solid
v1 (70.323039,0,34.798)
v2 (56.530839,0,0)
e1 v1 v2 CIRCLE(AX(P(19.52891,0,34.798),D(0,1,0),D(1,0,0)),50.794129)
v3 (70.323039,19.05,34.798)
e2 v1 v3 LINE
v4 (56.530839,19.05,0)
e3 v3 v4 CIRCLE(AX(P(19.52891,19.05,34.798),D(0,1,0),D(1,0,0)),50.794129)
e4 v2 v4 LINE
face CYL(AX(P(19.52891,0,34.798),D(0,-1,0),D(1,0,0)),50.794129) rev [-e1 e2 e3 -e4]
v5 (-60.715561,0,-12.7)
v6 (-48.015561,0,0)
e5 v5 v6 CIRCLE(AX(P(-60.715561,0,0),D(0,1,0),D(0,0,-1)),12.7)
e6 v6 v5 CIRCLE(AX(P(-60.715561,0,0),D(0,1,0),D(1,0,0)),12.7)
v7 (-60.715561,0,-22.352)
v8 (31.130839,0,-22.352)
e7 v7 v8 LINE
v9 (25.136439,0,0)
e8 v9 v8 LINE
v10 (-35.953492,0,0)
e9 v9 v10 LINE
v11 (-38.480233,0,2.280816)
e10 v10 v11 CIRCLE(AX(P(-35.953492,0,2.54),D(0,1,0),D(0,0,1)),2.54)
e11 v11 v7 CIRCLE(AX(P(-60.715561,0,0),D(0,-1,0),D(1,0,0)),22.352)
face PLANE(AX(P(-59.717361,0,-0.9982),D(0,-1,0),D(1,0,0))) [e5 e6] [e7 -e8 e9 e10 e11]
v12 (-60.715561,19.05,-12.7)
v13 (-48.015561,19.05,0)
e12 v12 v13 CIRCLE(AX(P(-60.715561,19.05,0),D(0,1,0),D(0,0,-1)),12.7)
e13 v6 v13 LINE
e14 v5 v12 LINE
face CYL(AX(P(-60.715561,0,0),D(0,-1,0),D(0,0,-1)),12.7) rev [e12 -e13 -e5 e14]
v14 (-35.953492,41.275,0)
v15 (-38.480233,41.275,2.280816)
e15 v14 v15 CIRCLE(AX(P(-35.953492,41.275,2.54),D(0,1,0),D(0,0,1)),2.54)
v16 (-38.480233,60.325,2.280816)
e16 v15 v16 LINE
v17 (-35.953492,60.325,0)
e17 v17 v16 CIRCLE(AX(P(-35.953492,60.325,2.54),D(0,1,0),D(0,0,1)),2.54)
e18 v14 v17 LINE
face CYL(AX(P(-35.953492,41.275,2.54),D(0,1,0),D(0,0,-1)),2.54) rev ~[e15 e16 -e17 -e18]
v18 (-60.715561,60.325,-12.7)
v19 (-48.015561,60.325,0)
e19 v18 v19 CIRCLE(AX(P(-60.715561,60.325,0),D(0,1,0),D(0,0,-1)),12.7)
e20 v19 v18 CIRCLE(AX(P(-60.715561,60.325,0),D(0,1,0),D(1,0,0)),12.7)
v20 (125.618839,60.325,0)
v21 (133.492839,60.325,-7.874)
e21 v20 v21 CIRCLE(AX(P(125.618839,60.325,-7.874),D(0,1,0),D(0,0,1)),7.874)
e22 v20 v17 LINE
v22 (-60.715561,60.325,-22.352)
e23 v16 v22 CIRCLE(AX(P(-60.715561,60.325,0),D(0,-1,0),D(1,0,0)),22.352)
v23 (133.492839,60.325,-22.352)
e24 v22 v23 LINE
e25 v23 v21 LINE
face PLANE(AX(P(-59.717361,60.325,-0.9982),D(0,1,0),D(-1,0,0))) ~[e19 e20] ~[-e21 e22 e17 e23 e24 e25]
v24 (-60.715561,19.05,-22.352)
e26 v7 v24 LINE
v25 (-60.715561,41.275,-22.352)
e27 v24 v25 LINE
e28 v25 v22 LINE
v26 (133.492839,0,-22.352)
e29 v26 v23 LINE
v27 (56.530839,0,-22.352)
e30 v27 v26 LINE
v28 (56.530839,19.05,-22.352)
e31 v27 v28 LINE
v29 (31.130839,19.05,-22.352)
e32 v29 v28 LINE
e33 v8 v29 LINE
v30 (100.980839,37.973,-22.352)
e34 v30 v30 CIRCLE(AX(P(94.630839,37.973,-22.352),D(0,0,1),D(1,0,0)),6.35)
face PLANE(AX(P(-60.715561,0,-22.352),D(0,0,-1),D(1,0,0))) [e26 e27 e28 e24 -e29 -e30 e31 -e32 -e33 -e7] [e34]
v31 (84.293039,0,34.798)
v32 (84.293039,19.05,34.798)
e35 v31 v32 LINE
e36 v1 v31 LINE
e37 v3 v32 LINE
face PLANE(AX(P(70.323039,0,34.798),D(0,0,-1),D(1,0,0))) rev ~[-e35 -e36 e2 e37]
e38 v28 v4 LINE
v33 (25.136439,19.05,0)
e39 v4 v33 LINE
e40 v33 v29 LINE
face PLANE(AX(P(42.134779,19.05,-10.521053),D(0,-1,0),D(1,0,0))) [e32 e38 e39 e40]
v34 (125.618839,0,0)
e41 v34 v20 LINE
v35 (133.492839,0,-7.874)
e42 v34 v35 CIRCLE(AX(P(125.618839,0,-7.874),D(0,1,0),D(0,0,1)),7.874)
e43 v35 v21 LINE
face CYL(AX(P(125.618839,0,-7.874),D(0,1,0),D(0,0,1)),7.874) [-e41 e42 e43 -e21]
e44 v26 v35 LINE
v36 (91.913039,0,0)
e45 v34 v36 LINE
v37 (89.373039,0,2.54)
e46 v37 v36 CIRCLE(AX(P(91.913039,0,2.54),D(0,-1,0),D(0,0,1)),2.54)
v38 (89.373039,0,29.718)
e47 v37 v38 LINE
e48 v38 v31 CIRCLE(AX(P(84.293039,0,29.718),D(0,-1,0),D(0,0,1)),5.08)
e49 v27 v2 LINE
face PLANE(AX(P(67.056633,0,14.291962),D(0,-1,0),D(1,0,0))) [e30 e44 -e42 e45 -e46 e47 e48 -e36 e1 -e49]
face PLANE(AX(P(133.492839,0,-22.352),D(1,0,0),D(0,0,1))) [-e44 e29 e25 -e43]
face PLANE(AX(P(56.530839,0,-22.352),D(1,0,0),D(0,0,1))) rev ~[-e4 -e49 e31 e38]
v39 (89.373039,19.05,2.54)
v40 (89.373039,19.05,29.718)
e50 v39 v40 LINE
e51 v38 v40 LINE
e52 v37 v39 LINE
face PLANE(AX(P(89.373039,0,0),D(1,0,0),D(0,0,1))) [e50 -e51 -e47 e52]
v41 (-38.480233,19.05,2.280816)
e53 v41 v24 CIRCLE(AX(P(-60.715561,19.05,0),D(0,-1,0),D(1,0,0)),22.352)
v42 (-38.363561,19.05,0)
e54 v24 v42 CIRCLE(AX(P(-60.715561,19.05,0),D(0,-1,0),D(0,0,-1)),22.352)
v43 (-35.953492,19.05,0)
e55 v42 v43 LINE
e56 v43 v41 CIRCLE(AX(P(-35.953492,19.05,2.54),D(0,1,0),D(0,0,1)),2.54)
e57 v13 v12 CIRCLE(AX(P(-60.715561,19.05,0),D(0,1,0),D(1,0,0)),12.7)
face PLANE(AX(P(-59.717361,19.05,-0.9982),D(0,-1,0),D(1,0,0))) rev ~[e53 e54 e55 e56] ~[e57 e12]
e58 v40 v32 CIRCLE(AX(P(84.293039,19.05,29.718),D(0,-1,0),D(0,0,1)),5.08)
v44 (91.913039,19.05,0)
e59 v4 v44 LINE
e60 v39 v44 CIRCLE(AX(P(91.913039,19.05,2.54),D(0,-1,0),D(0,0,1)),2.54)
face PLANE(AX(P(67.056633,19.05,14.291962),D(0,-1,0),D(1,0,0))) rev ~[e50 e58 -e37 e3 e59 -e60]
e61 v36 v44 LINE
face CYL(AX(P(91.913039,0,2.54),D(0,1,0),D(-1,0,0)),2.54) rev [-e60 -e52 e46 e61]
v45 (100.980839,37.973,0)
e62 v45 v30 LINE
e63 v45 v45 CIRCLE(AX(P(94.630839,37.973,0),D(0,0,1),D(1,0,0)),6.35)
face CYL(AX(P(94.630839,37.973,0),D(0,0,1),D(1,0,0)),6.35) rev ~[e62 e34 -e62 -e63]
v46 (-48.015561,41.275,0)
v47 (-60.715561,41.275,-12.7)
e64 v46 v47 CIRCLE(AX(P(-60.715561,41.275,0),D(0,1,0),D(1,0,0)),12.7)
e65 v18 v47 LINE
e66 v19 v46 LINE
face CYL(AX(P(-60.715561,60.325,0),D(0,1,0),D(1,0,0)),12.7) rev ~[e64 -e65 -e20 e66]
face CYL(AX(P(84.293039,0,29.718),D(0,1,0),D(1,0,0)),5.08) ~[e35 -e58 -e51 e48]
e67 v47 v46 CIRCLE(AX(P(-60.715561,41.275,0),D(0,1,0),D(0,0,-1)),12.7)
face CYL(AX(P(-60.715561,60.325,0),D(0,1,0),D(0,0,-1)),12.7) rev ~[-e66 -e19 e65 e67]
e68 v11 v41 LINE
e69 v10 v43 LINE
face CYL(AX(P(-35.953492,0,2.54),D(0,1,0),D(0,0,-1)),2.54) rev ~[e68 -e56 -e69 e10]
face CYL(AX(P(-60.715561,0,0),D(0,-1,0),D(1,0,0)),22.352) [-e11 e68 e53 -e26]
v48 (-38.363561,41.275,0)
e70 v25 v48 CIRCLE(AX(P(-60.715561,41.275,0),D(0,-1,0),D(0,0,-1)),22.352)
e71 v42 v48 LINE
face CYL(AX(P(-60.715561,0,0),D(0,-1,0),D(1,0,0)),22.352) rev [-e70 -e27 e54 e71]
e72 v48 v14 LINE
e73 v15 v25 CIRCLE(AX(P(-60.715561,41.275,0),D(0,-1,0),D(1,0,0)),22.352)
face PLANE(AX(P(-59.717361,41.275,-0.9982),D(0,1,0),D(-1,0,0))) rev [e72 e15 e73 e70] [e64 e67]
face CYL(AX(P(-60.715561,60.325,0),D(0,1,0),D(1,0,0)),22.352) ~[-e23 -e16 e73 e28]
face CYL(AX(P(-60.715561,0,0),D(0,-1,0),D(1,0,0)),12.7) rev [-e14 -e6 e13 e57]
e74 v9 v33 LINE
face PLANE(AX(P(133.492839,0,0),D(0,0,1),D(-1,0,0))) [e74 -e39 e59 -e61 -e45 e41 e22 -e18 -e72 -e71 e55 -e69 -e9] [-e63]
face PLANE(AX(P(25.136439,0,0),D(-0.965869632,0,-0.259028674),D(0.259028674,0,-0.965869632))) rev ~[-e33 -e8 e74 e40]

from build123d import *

# Parameters (mm, degrees)
F1_DEPTH = 60.325
F2_DEPTH = 19.05
F0_W     = 19.05
F0_H     = 34.798
F3_DEPTH = 19.05
F4_DEPTH = 19.05
F8_R     = 6.35
F9_DEPTH = 25.4
F10_R    = 7.874
F11_R    = 5.08
F12_R    = 2.54


with BuildPart() as f1:
    # F0 (on Front) → F1 (new body)
    with BuildSketch(Plane.XZ):
        with BuildLine():
            ThreePointArc((-38.3635606445, 0), (-44.9103098714, -15.8052507731), (-60.7155606445, -22.352))
            Line((-60.7155606445, -22.352), (31.1308393555, -22.352))
            Line((31.1308393555, -22.352), (25.1364393555, 0))
            Line((25.1364393555, 0), (-38.3635606445, 0))
        make_face()
        Polygon((25.1364393555, 0), (31.1308393555, -22.352), (56.5308393555, -22.352), (56.5308393555, 0), align=None)
        Polygon((56.5308393555, 0), (56.5308393555, -22.352), (133.4928393555, -22.352), (133.4928393555, 0), (89.3730393555, 0), (70.3230393555, 0), align=None)
    extrude(amount=-F1_DEPTH)

    # F0 (on Front) → F2 (cut)
    with BuildSketch(Plane.XZ):
        Polygon((25.1364393555, 0), (31.1308393555, -22.352), (56.5308393555, -22.352), (56.5308393555, 0), align=None)
    extrude(amount=-F2_DEPTH, mode=Mode.SUBTRACT)

    # F0 (on Front) → F3 (join)
    with BuildSketch(Plane.XZ):
        with BuildLine():
            ThreePointArc((70.3230393555, 34.798), (66.7492677026, 16.0821939471), (56.5308393555, 0))
            Line((56.5308393555, 0), (70.3230393555, 0))
            Line((70.3230393555, 0), (70.3230393555, 34.798))
        make_face()
        with Locations((79.8480393555, 17.399)):
            Rectangle(F0_W, F0_H)
    extrude(amount=-F3_DEPTH)


with BuildPart() as f4:
    # F0 (on Front) → F4 (new body)
    with BuildSketch(Plane.XZ):
        with BuildLine():
            ThreePointArc((-38.3635606445, 0), (-76.5208114176, 15.8052507731), (-60.7155606445, -22.352))
            ThreePointArc((-60.7155606445, -22.352), (-44.9103098714, -15.8052507731), (-38.3635606445, 0))
        make_face()
        with BuildLine():
            ThreePointArc((-60.7155606445, -12.7), (-69.6958167656, 8.9802561211), (-48.0155606445, 0))
            ThreePointArc((-48.0155606445, 0), (-51.7353045234, -8.9802561211), (-60.7155606445, -12.7))
        make_face(mode=Mode.SUBTRACT)
    extrude(amount=-F4_DEPTH)


with BuildPart() as f6_1:
    # F6: instance of F4
    add(f4.part.mirror(Plane.XZ.offset(-30.1625)))


with BuildPart() as f1_1:
    add(f1.part)

    # F7: union F4, F6_1
    add(f4.part)
    add(f6_1.part)

    # F8 (on face) → F9 (cut)
    with BuildSketch(Plane.XY):
        with Locations((94.6308393555, 37.973)):
            Circle(F8_R)
    extrude(amount=-F9_DEPTH, mode=Mode.SUBTRACT)

    # F10
    f10_edges = [f1_1.edges().sort_by_distance(p)[0] for p in [
        (133.492839, 30.1625, 0),
    ]]
    fillet(f10_edges, radius=F10_R)

    # F11
    f11_edges = [f1_1.edges().sort_by_distance(p)[0] for p in [
        (89.373039, 9.525, 34.798),
    ]]
    fillet(f11_edges, radius=F11_R)

    # F12
    f12_edges = [f1_1.edges().sort_by_distance(p)[0] for p in [
        (-38.363561, 50.8, 0),
        (-38.363561, 9.525, 0),
        (89.373039, 9.525, 0),
    ]]
    fillet(f12_edges, radius=F12_R)


solid = f1_1.part
